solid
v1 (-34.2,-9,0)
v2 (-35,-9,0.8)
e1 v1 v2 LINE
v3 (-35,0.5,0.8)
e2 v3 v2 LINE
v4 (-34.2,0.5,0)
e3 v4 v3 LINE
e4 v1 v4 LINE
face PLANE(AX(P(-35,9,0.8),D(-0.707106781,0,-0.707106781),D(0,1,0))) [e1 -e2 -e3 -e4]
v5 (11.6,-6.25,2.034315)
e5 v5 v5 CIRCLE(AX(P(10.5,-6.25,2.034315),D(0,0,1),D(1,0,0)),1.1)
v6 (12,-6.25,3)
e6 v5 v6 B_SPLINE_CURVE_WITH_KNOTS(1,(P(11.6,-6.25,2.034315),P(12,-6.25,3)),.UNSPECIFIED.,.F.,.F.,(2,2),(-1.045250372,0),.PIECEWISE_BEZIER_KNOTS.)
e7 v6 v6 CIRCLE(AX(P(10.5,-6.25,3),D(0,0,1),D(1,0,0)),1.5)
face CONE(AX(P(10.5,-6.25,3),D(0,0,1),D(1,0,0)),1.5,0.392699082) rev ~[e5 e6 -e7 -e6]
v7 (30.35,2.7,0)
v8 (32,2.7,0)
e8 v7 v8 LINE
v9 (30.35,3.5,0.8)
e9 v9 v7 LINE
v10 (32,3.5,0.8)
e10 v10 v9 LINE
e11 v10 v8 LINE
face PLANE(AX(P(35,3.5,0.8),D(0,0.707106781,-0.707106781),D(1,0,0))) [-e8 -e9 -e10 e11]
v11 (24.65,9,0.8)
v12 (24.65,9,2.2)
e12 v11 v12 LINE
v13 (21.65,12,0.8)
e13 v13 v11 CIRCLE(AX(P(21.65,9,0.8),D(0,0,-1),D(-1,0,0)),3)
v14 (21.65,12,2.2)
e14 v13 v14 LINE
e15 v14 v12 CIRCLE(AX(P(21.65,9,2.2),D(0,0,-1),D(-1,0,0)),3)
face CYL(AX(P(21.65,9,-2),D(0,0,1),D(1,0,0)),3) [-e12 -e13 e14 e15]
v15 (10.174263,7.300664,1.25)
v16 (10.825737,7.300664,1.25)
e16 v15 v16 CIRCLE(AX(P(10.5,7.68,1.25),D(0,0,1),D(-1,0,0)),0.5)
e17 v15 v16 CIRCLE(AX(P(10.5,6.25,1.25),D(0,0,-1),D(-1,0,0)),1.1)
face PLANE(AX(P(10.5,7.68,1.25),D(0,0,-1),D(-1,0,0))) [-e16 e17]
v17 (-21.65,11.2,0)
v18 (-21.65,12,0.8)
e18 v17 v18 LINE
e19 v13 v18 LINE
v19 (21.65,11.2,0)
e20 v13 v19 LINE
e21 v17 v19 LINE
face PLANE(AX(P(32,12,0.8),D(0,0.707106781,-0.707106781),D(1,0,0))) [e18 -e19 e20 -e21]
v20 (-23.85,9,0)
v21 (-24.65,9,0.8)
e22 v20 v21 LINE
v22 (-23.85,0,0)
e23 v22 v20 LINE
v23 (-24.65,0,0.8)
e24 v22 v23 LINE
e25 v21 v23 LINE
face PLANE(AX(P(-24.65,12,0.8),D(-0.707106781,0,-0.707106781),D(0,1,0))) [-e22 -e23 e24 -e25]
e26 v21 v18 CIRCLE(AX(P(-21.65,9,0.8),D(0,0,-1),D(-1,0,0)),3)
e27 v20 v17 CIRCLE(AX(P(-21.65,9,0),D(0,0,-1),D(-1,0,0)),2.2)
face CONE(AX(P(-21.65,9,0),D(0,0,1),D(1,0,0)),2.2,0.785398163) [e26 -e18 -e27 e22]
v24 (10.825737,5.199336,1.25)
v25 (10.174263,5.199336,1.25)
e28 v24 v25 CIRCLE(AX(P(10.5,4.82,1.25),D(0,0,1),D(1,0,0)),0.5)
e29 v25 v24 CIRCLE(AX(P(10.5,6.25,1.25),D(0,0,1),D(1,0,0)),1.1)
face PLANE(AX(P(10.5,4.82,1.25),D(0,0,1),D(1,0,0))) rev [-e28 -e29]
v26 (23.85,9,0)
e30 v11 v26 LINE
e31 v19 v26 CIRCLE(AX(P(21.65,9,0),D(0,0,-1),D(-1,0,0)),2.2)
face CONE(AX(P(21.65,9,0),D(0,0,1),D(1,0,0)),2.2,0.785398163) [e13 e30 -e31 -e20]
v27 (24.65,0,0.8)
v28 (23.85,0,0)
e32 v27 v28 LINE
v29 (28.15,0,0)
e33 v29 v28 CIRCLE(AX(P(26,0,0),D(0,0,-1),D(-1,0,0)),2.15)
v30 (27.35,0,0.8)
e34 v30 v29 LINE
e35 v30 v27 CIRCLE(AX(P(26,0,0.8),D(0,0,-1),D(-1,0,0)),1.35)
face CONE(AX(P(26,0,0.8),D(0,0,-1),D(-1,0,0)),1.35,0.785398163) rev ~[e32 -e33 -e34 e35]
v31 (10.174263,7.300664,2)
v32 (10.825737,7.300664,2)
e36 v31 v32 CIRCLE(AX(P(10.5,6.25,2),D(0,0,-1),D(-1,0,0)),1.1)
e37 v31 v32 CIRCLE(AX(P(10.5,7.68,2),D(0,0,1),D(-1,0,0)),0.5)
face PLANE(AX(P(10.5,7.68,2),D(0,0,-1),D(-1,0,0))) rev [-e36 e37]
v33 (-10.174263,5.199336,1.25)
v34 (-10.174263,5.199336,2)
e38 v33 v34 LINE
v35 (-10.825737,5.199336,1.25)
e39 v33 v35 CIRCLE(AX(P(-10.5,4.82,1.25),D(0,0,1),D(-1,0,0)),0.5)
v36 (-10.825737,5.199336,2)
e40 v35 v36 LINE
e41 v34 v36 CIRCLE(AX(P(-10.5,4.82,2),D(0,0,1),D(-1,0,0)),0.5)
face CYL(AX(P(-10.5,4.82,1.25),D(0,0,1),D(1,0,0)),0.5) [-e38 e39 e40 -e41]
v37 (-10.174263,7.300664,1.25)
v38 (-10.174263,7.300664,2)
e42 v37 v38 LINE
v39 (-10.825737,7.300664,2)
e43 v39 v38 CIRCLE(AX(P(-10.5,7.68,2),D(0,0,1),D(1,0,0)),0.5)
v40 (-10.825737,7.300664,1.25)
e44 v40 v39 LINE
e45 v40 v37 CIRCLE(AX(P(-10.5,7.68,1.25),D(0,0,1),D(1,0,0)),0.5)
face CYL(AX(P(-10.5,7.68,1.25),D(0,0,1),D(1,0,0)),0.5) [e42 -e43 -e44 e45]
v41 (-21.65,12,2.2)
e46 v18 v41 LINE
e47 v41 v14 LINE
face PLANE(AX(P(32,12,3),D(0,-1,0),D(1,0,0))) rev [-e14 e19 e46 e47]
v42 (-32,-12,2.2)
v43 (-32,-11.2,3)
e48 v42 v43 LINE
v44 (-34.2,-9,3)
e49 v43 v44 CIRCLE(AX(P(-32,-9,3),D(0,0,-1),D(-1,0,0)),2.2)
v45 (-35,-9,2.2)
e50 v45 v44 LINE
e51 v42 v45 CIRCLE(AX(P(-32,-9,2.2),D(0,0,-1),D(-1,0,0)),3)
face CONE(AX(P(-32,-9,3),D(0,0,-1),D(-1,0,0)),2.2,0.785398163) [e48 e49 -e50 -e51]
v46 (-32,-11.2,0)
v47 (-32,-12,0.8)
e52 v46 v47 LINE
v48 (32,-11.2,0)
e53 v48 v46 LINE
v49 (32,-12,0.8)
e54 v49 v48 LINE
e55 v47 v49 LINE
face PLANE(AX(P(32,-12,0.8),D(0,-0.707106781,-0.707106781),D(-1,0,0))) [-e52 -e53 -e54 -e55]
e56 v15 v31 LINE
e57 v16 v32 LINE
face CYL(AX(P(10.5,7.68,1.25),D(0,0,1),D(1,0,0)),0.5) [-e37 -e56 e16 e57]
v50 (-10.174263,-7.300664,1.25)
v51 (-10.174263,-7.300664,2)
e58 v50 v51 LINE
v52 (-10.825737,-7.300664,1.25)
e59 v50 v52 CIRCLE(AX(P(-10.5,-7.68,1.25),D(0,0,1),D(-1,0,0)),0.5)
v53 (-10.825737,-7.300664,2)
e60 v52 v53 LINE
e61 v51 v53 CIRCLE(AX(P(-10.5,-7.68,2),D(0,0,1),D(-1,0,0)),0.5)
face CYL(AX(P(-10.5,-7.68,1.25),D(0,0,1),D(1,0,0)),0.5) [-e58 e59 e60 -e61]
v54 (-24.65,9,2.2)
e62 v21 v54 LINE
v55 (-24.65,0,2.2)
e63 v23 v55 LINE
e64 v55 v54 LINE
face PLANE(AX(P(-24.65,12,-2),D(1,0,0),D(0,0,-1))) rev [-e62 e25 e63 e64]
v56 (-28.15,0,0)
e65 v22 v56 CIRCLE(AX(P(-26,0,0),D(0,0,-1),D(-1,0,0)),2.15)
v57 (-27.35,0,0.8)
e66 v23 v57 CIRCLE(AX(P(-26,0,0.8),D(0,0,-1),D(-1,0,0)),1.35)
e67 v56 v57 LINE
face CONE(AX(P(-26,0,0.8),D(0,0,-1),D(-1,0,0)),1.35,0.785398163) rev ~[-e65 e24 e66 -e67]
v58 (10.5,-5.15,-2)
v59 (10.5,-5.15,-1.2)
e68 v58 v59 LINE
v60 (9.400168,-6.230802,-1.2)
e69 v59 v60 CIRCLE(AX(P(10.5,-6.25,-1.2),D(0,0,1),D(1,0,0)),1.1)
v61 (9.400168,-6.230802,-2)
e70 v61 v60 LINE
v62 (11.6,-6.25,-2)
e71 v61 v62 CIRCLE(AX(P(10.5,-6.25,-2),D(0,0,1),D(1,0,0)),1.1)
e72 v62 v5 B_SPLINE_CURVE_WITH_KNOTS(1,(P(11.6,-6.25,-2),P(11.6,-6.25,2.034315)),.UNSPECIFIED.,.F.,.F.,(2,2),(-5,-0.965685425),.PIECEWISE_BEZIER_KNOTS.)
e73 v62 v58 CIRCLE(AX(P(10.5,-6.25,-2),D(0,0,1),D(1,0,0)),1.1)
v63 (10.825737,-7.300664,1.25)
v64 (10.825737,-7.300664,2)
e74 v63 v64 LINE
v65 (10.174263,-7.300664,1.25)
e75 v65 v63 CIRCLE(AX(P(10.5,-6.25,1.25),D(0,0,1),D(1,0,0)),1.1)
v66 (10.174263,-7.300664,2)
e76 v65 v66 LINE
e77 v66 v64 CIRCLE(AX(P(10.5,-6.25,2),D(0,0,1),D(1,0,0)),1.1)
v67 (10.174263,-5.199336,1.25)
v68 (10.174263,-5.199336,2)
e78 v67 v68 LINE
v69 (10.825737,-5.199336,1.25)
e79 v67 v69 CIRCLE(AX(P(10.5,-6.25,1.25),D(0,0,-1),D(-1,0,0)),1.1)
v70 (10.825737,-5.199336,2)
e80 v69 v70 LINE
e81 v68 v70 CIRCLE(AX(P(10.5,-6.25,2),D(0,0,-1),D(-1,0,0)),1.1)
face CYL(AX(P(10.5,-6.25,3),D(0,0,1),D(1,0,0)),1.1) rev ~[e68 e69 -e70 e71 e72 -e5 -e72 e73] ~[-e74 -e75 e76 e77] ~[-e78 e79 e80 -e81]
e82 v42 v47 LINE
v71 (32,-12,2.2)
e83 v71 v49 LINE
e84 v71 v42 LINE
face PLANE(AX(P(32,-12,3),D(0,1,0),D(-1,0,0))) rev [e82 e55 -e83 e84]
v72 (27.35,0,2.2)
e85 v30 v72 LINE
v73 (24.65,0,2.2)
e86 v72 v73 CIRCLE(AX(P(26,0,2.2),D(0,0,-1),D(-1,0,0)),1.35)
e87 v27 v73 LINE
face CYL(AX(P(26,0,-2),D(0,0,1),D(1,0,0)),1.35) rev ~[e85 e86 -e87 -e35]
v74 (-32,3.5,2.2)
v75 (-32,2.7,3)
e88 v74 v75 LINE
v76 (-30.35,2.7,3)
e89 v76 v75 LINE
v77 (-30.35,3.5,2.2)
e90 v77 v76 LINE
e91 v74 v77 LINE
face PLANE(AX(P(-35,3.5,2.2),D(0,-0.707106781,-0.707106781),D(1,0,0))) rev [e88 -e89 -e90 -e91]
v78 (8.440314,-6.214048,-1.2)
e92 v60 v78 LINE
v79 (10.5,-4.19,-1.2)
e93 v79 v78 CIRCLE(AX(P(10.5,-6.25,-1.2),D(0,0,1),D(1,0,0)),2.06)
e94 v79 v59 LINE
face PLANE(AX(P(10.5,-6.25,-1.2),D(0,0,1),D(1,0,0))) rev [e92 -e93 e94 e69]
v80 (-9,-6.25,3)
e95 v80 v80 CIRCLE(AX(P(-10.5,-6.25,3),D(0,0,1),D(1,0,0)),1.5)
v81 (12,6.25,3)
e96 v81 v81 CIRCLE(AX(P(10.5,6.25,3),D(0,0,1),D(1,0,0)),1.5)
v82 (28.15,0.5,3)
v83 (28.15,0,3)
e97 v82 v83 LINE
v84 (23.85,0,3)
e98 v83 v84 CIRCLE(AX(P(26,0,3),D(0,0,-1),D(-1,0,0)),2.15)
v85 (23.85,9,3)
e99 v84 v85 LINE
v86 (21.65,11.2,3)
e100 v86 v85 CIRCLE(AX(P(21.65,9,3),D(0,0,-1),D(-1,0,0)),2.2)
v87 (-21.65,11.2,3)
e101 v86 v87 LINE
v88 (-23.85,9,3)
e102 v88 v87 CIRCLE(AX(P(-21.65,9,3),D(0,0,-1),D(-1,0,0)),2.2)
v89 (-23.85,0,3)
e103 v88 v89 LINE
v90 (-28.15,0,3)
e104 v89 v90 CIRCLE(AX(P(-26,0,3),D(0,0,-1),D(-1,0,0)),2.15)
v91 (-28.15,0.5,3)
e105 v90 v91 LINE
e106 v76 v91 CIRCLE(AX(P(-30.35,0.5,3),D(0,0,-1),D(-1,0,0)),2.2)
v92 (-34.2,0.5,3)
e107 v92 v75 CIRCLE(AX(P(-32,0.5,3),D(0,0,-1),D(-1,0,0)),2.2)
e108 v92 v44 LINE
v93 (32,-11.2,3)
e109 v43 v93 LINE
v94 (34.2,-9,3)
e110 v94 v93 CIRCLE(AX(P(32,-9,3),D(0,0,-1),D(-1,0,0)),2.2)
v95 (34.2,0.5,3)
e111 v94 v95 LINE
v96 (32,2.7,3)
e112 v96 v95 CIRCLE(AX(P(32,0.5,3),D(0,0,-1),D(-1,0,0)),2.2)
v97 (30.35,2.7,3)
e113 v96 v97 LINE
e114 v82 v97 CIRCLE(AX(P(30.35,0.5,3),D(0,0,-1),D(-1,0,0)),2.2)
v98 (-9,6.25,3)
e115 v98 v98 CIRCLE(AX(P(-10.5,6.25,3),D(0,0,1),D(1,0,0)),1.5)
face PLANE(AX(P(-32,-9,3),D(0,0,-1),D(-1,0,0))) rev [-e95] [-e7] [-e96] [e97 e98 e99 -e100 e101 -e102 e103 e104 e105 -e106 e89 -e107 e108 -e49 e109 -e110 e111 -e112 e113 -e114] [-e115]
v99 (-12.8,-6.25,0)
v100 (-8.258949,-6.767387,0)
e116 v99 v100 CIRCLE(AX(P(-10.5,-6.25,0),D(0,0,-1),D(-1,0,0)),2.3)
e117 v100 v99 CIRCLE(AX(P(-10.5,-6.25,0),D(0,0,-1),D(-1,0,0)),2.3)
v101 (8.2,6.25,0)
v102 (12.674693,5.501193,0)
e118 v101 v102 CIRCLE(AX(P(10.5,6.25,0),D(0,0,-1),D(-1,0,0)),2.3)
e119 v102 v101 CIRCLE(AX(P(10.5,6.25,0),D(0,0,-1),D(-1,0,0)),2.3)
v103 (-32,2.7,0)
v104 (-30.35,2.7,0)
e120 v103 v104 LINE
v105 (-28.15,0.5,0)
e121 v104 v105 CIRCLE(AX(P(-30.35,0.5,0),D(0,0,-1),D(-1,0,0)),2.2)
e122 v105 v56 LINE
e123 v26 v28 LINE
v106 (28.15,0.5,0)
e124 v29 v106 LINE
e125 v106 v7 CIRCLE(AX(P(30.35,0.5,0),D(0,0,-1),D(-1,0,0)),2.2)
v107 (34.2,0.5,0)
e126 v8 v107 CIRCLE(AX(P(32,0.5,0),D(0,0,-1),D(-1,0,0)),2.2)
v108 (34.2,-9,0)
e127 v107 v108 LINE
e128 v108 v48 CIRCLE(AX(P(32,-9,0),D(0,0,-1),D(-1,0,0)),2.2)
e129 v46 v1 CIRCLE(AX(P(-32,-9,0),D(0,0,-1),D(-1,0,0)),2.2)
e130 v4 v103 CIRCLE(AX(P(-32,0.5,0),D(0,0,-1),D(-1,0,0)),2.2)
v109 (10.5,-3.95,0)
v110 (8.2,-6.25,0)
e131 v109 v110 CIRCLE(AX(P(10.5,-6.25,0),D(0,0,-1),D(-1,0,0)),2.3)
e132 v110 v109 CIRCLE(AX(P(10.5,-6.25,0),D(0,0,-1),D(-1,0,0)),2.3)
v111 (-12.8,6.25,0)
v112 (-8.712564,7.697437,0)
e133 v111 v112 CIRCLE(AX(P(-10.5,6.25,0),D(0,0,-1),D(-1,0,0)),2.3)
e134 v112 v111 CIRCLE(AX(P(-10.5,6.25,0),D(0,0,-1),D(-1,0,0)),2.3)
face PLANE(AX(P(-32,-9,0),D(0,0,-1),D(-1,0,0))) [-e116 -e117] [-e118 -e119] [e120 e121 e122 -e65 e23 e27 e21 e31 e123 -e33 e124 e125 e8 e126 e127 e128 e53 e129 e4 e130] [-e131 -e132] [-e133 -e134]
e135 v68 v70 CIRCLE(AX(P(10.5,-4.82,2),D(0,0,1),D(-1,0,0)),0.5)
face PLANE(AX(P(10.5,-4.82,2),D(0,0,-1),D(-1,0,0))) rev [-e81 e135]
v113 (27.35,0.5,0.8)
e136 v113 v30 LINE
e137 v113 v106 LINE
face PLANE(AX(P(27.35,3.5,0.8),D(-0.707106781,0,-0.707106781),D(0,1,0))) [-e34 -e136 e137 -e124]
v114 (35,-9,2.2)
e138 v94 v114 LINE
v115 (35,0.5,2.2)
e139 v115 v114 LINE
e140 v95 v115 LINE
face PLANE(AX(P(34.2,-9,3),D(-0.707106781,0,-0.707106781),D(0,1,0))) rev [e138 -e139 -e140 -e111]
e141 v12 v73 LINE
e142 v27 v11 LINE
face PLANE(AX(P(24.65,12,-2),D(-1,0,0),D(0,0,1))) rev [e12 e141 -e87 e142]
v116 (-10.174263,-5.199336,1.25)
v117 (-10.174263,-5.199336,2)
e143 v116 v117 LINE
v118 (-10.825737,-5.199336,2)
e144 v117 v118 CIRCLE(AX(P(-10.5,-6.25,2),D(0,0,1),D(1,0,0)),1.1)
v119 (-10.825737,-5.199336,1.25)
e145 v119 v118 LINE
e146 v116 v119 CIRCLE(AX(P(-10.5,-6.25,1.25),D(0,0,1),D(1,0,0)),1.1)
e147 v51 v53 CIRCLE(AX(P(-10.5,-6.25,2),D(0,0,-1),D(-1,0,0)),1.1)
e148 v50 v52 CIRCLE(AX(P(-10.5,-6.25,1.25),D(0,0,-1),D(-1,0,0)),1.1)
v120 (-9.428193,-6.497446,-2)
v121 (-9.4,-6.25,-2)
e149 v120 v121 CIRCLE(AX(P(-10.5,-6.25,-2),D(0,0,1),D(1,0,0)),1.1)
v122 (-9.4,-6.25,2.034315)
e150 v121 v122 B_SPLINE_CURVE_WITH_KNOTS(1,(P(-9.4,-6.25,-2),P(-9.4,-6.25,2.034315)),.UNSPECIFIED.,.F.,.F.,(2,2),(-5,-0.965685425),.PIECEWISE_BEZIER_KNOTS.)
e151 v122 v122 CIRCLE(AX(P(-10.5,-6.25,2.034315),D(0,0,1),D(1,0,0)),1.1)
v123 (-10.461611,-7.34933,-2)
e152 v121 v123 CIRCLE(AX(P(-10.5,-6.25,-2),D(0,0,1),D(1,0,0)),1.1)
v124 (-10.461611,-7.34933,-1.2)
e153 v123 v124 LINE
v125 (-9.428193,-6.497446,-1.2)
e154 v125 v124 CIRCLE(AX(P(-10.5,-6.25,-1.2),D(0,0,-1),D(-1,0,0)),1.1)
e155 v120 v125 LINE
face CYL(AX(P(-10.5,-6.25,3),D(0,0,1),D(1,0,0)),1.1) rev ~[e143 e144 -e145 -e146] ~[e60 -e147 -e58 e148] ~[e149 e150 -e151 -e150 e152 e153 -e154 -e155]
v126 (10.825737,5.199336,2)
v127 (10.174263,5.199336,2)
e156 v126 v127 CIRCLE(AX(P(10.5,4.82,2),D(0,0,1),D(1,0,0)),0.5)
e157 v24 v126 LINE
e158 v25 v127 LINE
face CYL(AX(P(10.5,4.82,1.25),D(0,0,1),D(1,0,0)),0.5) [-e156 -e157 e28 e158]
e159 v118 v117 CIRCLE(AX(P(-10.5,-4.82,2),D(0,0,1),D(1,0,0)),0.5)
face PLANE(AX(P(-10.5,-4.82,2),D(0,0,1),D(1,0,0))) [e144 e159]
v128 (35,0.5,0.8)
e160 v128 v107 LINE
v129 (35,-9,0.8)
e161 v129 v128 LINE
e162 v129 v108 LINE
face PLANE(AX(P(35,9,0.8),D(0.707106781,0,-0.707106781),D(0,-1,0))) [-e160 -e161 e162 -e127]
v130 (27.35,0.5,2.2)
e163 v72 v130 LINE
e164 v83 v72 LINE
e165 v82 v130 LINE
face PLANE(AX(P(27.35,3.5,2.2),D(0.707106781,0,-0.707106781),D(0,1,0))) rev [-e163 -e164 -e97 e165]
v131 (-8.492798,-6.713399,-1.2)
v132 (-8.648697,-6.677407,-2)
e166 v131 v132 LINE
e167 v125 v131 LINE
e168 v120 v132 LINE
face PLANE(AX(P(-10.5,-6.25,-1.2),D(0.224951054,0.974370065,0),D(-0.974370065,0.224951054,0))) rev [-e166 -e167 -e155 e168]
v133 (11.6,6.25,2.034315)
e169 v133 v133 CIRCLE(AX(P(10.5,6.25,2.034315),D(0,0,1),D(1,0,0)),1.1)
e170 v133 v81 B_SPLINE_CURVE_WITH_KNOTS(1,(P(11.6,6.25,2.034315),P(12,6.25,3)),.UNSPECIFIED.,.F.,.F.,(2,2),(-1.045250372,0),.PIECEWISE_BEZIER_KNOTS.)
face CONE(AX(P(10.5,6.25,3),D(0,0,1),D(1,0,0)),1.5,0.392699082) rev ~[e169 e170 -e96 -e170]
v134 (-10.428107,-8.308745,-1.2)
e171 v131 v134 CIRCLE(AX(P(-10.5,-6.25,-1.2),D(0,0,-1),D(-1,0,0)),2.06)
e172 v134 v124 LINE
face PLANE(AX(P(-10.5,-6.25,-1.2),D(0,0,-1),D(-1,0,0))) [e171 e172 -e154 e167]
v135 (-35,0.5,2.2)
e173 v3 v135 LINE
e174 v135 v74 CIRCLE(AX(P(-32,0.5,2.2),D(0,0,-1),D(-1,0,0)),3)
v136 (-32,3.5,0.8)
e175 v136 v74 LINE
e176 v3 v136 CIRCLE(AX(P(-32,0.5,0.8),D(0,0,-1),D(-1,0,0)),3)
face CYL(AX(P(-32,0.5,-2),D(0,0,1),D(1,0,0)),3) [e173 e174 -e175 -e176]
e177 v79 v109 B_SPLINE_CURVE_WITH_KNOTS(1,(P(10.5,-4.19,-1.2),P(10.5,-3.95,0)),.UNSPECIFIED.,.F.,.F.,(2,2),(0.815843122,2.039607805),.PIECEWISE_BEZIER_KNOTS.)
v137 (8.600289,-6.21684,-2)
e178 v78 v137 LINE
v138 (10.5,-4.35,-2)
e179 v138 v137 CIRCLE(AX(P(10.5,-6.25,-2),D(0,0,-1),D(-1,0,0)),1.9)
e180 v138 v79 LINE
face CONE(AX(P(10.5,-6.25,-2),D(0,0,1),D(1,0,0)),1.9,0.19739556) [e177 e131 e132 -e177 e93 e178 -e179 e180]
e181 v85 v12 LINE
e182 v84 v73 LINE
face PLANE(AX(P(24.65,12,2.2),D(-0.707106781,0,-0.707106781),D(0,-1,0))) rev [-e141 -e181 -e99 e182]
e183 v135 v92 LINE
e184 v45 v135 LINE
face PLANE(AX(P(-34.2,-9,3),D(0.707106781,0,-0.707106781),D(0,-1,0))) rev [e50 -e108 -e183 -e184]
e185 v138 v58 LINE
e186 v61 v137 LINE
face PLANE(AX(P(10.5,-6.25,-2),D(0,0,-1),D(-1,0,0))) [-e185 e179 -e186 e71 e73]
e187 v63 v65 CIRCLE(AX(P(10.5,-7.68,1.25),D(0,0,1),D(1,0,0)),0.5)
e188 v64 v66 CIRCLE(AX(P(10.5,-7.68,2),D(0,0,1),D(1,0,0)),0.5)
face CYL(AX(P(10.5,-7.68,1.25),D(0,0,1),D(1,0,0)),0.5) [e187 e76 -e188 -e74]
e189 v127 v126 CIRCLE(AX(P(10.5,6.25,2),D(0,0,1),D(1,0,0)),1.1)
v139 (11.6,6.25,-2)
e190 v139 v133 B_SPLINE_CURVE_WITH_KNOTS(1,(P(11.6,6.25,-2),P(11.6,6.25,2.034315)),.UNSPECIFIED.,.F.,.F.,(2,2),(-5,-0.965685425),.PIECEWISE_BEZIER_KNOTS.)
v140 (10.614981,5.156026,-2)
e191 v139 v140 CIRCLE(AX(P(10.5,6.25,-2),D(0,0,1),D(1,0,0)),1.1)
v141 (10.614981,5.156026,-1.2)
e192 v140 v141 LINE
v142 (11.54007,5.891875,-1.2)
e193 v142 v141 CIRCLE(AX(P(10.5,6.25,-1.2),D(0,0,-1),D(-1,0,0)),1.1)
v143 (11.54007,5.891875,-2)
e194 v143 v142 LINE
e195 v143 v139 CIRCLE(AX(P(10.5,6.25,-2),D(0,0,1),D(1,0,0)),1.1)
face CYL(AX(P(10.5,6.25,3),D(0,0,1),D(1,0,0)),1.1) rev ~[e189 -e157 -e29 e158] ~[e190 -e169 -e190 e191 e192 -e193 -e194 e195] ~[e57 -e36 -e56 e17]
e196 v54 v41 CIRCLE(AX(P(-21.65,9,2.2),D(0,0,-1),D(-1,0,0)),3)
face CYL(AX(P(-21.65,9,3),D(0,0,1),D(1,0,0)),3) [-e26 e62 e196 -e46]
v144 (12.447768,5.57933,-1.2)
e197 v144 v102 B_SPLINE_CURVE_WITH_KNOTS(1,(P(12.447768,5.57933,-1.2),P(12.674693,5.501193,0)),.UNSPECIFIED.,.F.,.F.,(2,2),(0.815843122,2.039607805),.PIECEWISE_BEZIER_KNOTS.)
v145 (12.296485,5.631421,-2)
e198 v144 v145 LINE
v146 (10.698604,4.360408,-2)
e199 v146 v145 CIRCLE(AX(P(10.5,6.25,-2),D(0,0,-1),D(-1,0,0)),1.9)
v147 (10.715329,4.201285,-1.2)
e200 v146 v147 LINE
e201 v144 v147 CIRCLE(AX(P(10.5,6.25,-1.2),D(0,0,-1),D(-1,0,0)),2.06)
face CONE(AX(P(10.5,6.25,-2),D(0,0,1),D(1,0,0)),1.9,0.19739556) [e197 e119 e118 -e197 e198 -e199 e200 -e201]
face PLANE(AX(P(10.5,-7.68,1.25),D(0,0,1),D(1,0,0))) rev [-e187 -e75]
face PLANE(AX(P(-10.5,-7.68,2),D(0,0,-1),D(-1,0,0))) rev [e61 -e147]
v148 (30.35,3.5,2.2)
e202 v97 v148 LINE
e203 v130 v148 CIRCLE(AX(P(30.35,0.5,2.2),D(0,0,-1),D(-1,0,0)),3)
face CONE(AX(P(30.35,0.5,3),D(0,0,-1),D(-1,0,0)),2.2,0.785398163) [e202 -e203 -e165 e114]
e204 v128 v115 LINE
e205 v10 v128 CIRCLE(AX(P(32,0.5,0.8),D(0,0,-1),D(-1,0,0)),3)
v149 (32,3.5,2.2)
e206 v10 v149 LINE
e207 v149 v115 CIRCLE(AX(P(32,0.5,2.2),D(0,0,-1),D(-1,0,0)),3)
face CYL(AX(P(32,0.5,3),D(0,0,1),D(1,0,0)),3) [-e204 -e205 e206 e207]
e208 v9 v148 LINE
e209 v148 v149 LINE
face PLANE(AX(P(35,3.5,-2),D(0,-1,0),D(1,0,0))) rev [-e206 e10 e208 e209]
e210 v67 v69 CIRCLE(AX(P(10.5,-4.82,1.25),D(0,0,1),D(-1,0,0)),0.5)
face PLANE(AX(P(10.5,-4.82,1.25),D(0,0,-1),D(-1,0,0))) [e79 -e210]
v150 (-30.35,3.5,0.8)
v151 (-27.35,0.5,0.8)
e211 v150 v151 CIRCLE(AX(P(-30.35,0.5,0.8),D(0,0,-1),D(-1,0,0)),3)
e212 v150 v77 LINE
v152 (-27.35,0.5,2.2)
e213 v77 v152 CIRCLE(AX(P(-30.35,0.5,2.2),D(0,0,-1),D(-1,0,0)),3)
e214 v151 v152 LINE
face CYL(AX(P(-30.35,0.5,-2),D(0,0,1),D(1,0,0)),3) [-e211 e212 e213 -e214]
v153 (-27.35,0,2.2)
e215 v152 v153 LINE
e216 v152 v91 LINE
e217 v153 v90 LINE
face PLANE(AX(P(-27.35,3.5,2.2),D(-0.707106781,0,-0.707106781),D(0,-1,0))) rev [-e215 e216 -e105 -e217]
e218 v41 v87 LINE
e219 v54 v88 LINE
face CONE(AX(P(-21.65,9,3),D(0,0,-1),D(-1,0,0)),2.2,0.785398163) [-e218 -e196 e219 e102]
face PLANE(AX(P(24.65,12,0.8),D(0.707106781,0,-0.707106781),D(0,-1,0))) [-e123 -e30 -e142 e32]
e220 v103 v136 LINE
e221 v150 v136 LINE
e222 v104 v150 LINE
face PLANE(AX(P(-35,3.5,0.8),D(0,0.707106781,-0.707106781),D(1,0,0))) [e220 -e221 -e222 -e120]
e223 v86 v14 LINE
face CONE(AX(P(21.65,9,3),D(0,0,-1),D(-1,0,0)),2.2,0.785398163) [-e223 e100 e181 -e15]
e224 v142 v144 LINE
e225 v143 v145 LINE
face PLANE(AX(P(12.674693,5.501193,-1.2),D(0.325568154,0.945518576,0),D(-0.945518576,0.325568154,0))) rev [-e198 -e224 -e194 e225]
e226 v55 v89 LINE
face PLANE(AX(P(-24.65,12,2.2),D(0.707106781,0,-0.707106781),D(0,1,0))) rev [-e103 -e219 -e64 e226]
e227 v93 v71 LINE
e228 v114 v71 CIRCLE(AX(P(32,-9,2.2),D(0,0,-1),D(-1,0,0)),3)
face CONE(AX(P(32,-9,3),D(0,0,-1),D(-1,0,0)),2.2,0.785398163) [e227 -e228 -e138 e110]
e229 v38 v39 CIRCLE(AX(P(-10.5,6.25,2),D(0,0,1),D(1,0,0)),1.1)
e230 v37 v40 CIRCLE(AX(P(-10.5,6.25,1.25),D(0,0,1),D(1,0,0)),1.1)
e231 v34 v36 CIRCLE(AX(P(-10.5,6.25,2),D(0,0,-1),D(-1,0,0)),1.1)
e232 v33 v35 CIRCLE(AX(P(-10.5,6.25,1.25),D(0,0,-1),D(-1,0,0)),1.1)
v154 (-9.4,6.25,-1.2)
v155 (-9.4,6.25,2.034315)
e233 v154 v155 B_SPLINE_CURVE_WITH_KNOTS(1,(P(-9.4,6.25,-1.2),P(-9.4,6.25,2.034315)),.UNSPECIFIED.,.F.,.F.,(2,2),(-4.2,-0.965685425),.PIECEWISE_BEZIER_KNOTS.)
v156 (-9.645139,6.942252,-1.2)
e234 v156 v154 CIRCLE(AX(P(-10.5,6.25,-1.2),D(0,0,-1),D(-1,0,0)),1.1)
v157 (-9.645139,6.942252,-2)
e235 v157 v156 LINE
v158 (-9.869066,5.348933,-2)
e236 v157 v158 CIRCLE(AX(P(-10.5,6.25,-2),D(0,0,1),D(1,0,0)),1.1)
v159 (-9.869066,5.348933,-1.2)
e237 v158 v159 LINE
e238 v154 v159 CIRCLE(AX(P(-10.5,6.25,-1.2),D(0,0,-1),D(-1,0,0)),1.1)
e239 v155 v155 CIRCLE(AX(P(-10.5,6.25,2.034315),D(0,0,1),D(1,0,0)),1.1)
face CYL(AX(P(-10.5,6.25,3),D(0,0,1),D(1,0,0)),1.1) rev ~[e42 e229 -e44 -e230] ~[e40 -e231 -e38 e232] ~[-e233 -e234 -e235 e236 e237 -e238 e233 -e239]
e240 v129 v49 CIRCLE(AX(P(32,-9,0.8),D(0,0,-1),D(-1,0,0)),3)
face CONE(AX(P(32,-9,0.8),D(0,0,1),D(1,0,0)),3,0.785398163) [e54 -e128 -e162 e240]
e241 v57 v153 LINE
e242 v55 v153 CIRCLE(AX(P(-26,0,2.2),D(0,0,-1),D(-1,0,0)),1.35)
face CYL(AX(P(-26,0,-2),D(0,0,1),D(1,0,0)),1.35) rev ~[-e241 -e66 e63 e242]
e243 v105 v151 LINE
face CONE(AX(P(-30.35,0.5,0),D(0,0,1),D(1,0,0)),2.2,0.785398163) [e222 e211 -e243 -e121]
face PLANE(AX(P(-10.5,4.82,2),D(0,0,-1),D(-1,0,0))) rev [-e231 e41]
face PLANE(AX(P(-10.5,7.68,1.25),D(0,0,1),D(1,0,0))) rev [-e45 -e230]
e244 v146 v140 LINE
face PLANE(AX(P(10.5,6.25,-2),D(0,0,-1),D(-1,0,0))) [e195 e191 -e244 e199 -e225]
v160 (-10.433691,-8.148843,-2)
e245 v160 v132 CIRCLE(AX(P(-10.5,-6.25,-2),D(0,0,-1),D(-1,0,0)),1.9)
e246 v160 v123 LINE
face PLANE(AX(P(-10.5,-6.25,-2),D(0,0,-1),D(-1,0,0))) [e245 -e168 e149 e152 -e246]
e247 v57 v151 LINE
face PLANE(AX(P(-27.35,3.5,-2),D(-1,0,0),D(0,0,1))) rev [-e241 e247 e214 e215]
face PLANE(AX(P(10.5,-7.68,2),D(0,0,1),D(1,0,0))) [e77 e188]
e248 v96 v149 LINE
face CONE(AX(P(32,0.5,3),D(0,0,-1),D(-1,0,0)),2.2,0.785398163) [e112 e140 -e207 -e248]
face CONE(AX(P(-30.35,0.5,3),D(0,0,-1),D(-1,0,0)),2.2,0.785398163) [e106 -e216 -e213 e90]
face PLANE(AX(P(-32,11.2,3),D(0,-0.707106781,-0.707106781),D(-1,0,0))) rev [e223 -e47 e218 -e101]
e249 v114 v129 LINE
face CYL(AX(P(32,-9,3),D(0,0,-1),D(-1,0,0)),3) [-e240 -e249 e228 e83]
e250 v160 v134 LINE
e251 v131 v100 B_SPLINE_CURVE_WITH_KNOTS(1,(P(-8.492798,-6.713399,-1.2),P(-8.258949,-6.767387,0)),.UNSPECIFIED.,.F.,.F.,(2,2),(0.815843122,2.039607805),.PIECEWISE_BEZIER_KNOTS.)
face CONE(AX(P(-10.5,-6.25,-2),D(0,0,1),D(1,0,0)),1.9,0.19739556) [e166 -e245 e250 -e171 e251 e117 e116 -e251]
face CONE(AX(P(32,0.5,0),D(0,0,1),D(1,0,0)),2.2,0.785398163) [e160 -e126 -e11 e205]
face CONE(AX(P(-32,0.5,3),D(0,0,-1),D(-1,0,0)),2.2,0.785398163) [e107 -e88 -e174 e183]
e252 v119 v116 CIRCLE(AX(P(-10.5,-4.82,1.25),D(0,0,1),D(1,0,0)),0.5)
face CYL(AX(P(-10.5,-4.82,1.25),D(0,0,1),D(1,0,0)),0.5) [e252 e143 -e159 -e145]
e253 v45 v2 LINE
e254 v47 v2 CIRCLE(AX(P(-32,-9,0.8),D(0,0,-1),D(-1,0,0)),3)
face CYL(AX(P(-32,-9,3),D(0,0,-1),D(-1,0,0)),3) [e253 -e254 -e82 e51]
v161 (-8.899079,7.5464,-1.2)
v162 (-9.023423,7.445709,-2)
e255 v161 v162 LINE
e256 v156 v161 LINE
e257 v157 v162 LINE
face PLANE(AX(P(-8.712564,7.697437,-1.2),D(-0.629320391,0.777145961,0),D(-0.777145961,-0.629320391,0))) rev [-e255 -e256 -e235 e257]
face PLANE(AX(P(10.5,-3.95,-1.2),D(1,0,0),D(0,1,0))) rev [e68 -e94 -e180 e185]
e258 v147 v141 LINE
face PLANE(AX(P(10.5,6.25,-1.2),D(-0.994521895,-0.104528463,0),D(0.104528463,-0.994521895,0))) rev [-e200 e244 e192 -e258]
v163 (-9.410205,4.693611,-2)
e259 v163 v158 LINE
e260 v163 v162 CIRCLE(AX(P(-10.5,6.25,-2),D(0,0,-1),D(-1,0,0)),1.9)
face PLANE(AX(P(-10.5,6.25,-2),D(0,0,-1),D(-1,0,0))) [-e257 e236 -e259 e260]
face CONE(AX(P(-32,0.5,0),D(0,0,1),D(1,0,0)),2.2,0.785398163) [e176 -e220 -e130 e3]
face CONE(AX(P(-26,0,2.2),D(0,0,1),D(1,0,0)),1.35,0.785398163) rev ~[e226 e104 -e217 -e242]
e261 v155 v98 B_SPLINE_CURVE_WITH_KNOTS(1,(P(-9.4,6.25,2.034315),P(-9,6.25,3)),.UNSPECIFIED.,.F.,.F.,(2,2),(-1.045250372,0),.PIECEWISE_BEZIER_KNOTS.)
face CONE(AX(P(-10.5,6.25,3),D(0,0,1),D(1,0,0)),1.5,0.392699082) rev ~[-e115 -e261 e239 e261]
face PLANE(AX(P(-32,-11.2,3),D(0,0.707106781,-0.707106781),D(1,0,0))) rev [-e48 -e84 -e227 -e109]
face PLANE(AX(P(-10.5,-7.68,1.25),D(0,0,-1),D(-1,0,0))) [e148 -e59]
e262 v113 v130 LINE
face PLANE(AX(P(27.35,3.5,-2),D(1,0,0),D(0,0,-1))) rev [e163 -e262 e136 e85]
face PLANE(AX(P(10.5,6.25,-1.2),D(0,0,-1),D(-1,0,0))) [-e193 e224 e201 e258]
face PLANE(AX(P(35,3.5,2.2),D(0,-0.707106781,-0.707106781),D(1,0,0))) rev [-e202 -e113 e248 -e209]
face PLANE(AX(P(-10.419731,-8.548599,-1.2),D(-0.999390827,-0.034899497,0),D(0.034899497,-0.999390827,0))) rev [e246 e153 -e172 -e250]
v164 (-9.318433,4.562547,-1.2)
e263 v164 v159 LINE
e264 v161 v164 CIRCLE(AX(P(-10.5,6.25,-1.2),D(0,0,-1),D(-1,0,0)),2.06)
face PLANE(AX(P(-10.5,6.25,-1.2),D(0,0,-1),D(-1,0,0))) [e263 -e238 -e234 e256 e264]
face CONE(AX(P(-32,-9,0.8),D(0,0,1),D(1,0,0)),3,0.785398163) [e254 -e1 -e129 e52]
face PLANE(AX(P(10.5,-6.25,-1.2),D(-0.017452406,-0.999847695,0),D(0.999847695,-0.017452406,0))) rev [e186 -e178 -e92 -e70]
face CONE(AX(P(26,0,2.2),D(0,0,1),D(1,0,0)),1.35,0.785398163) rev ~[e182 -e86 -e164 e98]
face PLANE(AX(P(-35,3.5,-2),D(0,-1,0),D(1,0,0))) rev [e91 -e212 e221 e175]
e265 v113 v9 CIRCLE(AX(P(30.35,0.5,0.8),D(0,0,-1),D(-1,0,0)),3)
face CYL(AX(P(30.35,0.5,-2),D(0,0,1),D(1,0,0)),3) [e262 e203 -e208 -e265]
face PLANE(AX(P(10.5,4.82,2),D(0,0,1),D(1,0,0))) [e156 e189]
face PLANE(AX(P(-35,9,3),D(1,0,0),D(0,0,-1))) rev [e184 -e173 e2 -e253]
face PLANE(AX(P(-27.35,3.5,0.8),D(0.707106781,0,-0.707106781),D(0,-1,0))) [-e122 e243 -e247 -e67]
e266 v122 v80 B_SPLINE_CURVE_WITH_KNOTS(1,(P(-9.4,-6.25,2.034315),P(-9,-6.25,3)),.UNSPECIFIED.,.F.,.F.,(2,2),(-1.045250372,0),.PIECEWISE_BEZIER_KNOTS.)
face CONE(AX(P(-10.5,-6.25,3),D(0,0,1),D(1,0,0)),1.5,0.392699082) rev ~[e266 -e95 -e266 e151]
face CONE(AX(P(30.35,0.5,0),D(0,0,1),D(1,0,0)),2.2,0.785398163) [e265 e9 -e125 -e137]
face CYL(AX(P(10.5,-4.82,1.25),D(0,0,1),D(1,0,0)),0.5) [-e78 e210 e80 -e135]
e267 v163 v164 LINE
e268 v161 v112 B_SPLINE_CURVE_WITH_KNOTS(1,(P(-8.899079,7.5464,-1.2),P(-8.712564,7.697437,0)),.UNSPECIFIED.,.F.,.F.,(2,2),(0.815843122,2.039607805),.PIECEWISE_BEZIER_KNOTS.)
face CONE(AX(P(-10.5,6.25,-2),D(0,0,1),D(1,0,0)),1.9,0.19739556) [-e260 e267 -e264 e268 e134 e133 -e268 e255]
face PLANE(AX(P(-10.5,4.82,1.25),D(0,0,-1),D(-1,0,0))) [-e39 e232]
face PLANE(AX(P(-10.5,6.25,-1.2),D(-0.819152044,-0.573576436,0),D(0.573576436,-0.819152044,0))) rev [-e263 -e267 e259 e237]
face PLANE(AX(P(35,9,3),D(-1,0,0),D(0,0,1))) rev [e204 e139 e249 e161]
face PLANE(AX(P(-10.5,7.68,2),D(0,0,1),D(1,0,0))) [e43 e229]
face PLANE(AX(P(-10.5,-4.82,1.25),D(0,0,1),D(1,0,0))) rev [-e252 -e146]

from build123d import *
from OCP.BRepFilletAPI import BRepFilletAPI_MakeChamfer

# Parameters (mm, degrees)
BOSS_EXTRUDE1_DEPTH            = 3
SKETCH4_R                      = 2.3
BOSS_EXTRUDE2_DEPTH            = 2
M2_CLEARANCE_HOLE1_D           = 2.2
M2_CLEARANCE_HOLE1_CSINK_D     = 3
M2_CLEARANCE_HOLE1_CSINK_ANGLE = 45
BOSS_EXTRUDE3_START            = -1
BOSS_EXTRUDE3_DEPTH            = 0.75
CHAMFER1_SIZE                  = 0.4
CHAMFER1_SIZE_2                = 2
CUT_EXTRUDE2_START             = -0.8
CUT_EXTRUDE2_DEPTH             = 0.8
CUT_EXTRUDE3_DEPTH             = 38.336309405
FILLET1_R                      = 3
CHAMFER2_SIZE                  = 0.8


with BuildPart() as part:
    # Sketch1 → Boss-Extrude1 (new body)
    with BuildSketch(Plane.XY):
        with BuildLine():
            Line((32, 12), (-32, 12))
            ThreePointArc((-32, 12), (-34.121320344, 11.121320344), (-35, 9))
            Line((-35, 9), (-35, -9))
            ThreePointArc((-35, -9), (-34.121320344, -11.121320344), (-32, -12))
            Line((-32, -12), (32, -12))
            ThreePointArc((32, -12), (34.121320344, -11.121320344), (35, -9))
            Line((35, -9), (35, 9))
            ThreePointArc((35, 9), (34.121320344, 11.121320344), (32, 12))
        make_face()
    extrude(amount=BOSS_EXTRUDE1_DEPTH)

    # Sketch4 → Boss-Extrude2 (add)
    with BuildSketch(Plane(origin=(0, 0, 0), x_dir=(-1, 0, 0), z_dir=(0, 0, -1))):
        with Locations((-10.5, 6.25)):
            Circle(SKETCH4_R)
        with Locations((10.5, 6.25)):
            Circle(SKETCH4_R)
        with Locations((10.5, -6.25)):
            Circle(SKETCH4_R)
        with Locations((-10.5, -6.25)):
            Circle(SKETCH4_R)
    extrude(amount=BOSS_EXTRUDE2_DEPTH)

    # M2 Clearance Hole1 (through all)
    with Locations(Plane.XY.offset(3)):
        with Locations((10.5, 6.25), (10.5, -6.25), (-10.5, -6.25), (-10.5, 6.25)):
            CounterSinkHole(M2_CLEARANCE_HOLE1_D / 2, M2_CLEARANCE_HOLE1_CSINK_D / 2, counter_sink_angle=M2_CLEARANCE_HOLE1_CSINK_ANGLE)

    # Sketch6 → Boss-Extrude3 (add)
    with BuildSketch(Plane.XY.offset(3).offset(BOSS_EXTRUDE3_START)):
        with BuildLine():
            Line((10.124367201, 5.15), (10.875632799, 5.15))
            ThreePointArc((10.875632799, 5.15), (10.5, 5.32), (10.124367201, 5.15))
        make_face()
        with BuildLine():
            Line((10.124367201, 7.35), (10.875632799, 7.35))
            ThreePointArc((10.875632799, 7.35), (10.5, 7.18), (10.124367201, 7.35))
        make_face()
        with BuildLine():
            Line((-10.124367201, 5.15), (-10.875632799, 5.15))
            ThreePointArc((-10.875632799, 5.15), (-10.5, 5.32), (-10.124367201, 5.15))
        make_face()
        with BuildLine():
            Line((-10.124367201, 7.35), (-10.875632799, 7.35))
            ThreePointArc((-10.875632799, 7.35), (-10.5, 7.18), (-10.124367201, 7.35))
        make_face()
        with BuildLine():
            Line((10.124367201, -7.35), (10.875632799, -7.35))
            ThreePointArc((10.875632799, -7.35), (10.5, -7.18), (10.124367201, -7.35))
        make_face()
        with BuildLine():
            Line((10.124367201, -5.15), (10.875632799, -5.15))
            ThreePointArc((10.875632799, -5.15), (10.5, -5.32), (10.124367201, -5.15))
        make_face()
        with BuildLine():
            Line((-10.124367201, -7.35), (-10.875632799, -7.35))
            ThreePointArc((-10.875632799, -7.35), (-10.5, -7.18), (-10.124367201, -7.35))
        make_face()
        with BuildLine():
            Line((-10.124367201, -5.15), (-10.875632799, -5.15))
            ThreePointArc((-10.875632799, -5.15), (-10.5, -5.32), (-10.124367201, -5.15))
        make_face()
    extrude(amount=-BOSS_EXTRUDE3_DEPTH)

    # Chamfer1
    chamfer1_edges_1 = [part.edges().sort_by_distance(p)[0] for p in [
        (12.8, 6.25, -2),
    ]]
    chamfer1_side_1 = [part.faces().sort_by_distance(p)[0] for p in [
        (12.792, 6.25, -2),
    ]]
    chamfer1_edges_2 = [part.edges().sort_by_distance(p)[0] for p in [
        (-8.2, 6.25, -2),
    ]]
    chamfer1_side_2 = [part.faces().sort_by_distance(p)[0] for p in [
        (-8.208, 6.25, -2),
    ]]
    chamfer1_edges_3 = [part.edges().sort_by_distance(p)[0] for p in [
        (-8.2, -6.25, -2),
    ]]
    chamfer1_side_3 = [part.faces().sort_by_distance(p)[0] for p in [
        (-8.208, -6.25, -2),
    ]]
    chamfer1_edges_4 = [part.edges().sort_by_distance(p)[0] for p in [
        (12.8, -6.25, -2),
    ]]
    chamfer1_side_4 = [part.faces().sort_by_distance(p)[0] for p in [
        (12.792, -6.25, -2),
    ]]
    chamfer1 = BRepFilletAPI_MakeChamfer(part.part.solid().wrapped)
    for e in chamfer1_edges_1:
        chamfer1.Add(CHAMFER1_SIZE - 0.0001, CHAMFER1_SIZE_2 - 0.0001, e.wrapped, chamfer1_side_1[0].wrapped)
    for e in chamfer1_edges_2:
        chamfer1.Add(CHAMFER1_SIZE - 0.0001, CHAMFER1_SIZE_2 - 0.0001, e.wrapped, chamfer1_side_2[0].wrapped)
    for e in chamfer1_edges_3:
        chamfer1.Add(CHAMFER1_SIZE - 0.0001, CHAMFER1_SIZE_2 - 0.0001, e.wrapped, chamfer1_side_3[0].wrapped)
    for e in chamfer1_edges_4:
        chamfer1.Add(CHAMFER1_SIZE - 0.0001, CHAMFER1_SIZE_2 - 0.0001, e.wrapped, chamfer1_side_4[0].wrapped)
    add(Compound.cast(chamfer1.Shape()), mode=Mode.REPLACE)  # a hair under: the kernel refuses the full size

    # Sketch5 → Cut-Extrude2 (cut)
    with BuildSketch(Plane(origin=(0, 0, -2), x_dir=(-1, 0, 0), z_dir=(0, 0, -1)).offset(CUT_EXTRUDE2_START)):
        with BuildLine():
            Line((8.712564289, 7.697436899), (10.5, 6.25))
            Line((10.5, 6.25), (9.180774196, 4.365950298))
            ThreePointArc((9.180774196, 4.365950298), (8.222383442, 5.929901868), (8.712564289, 7.697436899))
        make_face()
        with BuildLine():
            Line((10.419731158, -8.548598902), (10.5, -6.25))
            Line((10.5, -6.25), (8.258948851, -6.767387425))
            ThreePointArc((8.258948851, -6.767387425), (9.037020093, -8.024736542), (10.419731158, -8.548598902))
        make_face()
        with BuildLine():
            Line((-12.674692724, 5.501193245), (-10.5, 6.25))
            Line((-10.5, 6.25), (-10.740415466, 3.962599641))
            ThreePointArc((-10.740415466, 3.962599641), (-11.931783664, 4.450001239), (-12.674692724, 5.501193245))
        make_face()
        with BuildLine():
            Line((-10.5, -3.95), (-10.5, -6.25))
            Line((-10.5, -6.25), (-8.200350301, -6.209859465))
            ThreePointArc((-8.200350301, -6.209859465), (-8.887908692, -4.609523967), (-10.5, -3.95))
        make_face()
    extrude(amount=CUT_EXTRUDE2_DEPTH, mode=Mode.SUBTRACT)

    # Sketch7 → Cut-Extrude3 (cut, through all)
    with BuildSketch(Plane.XY.offset(3)):
        with BuildLine():
            Line((35, 3.5), (27.35, 3.5))
            Line((27.35, 3.5), (27.35, 0))
            ThreePointArc((27.35, 0), (26, -1.35), (24.65, 0))
            Line((24.65, 0), (24.65, 12))
            Line((24.65, 12), (35, 12))
            Line((35, 12), (35, 3.5))
        make_face()
        with BuildLine():
            Line((-35, 12), (-24.65, 12))
            Line((-24.65, 12), (-24.65, 0))
            ThreePointArc((-24.65, 0), (-26, -1.35), (-27.35, 0))
            Line((-27.35, 0), (-27.35, 3.5))
            Line((-27.35, 3.5), (-35, 3.5))
            Line((-35, 3.5), (-35, 12))
        make_face()
    extrude(amount=-CUT_EXTRUDE3_DEPTH, mode=Mode.SUBTRACT)

    # Fillet1
    fillet1_edges = [part.edges().sort_by_distance(p)[0] for p in [
        (24.65, 12, 1.5),
        (35, 3.5, 1.5),
        (27.35, 3.5, 1.5),
        (-35, 3.5, 1.5),
        (-27.35, 3.5, 1.5),
        (-24.65, 12, 1.5),
    ]]
    fillet(fillet1_edges, radius=FILLET1_R)

    # Chamfer2
    chamfer2_edges = [part.edges().sort_by_distance(p)[0] for p in [
        (35, -4.25, 0),
        (34.121320344, -11.121320344, 0),
        (0, -12, 0),
        (-34.121320344, -11.121320344, 0),
        (34.121320344, -11.121320344, 3),
        (35, -4.25, 3),
        (-26, -1.35, 0),
        (-27.35, 0.25, 0),
        (24.65, 4.5, 0),
        (26, -1.35, 0),
        (26, -1.35, 3),
        (27.35, 0.25, 3),
        (-26, -1.35, 3),
        (-24.65, 4.5, 3),
        (-31.175, 3.5, 0),
        (-31.175, 3.5, 3),
        (31.175, 3.5, 3),
        (24.65, 4.5, 3),
        (0, 12, 3),
        (-27.35, 0.25, 3),
        (-35, -4.25, 3),
        (34.121320344, 2.621320344, 3),
        (28.228679656, 2.621320344, 3),
        (23.771320344, 11.121320344, 3),
        (-23.771320344, 11.121320344, 3),
        (-28.228679656, 2.621320344, 3),
        (-34.121320344, 2.621320344, 3),
        (-35, -4.25, 0),
        (31.175, 3.5, 0),
        (-24.65, 4.5, 0),
        (0, 12, 0),
        (27.35, 0.25, 0),
        (34.121320344, 2.621320344, 0),
        (28.228679656, 2.621320344, 0),
        (23.771320344, 11.121320344, 0),
        (-23.771320344, 11.121320344, 0),
        (-28.228679656, 2.621320344, 0),
        (-34.121320344, 2.621320344, 0),
        (-34.121320344, -11.121320344, 3),
        (0, -12, 3),
    ]]
    chamfer(chamfer2_edges, length=CHAMFER2_SIZE)


solid = part.part
